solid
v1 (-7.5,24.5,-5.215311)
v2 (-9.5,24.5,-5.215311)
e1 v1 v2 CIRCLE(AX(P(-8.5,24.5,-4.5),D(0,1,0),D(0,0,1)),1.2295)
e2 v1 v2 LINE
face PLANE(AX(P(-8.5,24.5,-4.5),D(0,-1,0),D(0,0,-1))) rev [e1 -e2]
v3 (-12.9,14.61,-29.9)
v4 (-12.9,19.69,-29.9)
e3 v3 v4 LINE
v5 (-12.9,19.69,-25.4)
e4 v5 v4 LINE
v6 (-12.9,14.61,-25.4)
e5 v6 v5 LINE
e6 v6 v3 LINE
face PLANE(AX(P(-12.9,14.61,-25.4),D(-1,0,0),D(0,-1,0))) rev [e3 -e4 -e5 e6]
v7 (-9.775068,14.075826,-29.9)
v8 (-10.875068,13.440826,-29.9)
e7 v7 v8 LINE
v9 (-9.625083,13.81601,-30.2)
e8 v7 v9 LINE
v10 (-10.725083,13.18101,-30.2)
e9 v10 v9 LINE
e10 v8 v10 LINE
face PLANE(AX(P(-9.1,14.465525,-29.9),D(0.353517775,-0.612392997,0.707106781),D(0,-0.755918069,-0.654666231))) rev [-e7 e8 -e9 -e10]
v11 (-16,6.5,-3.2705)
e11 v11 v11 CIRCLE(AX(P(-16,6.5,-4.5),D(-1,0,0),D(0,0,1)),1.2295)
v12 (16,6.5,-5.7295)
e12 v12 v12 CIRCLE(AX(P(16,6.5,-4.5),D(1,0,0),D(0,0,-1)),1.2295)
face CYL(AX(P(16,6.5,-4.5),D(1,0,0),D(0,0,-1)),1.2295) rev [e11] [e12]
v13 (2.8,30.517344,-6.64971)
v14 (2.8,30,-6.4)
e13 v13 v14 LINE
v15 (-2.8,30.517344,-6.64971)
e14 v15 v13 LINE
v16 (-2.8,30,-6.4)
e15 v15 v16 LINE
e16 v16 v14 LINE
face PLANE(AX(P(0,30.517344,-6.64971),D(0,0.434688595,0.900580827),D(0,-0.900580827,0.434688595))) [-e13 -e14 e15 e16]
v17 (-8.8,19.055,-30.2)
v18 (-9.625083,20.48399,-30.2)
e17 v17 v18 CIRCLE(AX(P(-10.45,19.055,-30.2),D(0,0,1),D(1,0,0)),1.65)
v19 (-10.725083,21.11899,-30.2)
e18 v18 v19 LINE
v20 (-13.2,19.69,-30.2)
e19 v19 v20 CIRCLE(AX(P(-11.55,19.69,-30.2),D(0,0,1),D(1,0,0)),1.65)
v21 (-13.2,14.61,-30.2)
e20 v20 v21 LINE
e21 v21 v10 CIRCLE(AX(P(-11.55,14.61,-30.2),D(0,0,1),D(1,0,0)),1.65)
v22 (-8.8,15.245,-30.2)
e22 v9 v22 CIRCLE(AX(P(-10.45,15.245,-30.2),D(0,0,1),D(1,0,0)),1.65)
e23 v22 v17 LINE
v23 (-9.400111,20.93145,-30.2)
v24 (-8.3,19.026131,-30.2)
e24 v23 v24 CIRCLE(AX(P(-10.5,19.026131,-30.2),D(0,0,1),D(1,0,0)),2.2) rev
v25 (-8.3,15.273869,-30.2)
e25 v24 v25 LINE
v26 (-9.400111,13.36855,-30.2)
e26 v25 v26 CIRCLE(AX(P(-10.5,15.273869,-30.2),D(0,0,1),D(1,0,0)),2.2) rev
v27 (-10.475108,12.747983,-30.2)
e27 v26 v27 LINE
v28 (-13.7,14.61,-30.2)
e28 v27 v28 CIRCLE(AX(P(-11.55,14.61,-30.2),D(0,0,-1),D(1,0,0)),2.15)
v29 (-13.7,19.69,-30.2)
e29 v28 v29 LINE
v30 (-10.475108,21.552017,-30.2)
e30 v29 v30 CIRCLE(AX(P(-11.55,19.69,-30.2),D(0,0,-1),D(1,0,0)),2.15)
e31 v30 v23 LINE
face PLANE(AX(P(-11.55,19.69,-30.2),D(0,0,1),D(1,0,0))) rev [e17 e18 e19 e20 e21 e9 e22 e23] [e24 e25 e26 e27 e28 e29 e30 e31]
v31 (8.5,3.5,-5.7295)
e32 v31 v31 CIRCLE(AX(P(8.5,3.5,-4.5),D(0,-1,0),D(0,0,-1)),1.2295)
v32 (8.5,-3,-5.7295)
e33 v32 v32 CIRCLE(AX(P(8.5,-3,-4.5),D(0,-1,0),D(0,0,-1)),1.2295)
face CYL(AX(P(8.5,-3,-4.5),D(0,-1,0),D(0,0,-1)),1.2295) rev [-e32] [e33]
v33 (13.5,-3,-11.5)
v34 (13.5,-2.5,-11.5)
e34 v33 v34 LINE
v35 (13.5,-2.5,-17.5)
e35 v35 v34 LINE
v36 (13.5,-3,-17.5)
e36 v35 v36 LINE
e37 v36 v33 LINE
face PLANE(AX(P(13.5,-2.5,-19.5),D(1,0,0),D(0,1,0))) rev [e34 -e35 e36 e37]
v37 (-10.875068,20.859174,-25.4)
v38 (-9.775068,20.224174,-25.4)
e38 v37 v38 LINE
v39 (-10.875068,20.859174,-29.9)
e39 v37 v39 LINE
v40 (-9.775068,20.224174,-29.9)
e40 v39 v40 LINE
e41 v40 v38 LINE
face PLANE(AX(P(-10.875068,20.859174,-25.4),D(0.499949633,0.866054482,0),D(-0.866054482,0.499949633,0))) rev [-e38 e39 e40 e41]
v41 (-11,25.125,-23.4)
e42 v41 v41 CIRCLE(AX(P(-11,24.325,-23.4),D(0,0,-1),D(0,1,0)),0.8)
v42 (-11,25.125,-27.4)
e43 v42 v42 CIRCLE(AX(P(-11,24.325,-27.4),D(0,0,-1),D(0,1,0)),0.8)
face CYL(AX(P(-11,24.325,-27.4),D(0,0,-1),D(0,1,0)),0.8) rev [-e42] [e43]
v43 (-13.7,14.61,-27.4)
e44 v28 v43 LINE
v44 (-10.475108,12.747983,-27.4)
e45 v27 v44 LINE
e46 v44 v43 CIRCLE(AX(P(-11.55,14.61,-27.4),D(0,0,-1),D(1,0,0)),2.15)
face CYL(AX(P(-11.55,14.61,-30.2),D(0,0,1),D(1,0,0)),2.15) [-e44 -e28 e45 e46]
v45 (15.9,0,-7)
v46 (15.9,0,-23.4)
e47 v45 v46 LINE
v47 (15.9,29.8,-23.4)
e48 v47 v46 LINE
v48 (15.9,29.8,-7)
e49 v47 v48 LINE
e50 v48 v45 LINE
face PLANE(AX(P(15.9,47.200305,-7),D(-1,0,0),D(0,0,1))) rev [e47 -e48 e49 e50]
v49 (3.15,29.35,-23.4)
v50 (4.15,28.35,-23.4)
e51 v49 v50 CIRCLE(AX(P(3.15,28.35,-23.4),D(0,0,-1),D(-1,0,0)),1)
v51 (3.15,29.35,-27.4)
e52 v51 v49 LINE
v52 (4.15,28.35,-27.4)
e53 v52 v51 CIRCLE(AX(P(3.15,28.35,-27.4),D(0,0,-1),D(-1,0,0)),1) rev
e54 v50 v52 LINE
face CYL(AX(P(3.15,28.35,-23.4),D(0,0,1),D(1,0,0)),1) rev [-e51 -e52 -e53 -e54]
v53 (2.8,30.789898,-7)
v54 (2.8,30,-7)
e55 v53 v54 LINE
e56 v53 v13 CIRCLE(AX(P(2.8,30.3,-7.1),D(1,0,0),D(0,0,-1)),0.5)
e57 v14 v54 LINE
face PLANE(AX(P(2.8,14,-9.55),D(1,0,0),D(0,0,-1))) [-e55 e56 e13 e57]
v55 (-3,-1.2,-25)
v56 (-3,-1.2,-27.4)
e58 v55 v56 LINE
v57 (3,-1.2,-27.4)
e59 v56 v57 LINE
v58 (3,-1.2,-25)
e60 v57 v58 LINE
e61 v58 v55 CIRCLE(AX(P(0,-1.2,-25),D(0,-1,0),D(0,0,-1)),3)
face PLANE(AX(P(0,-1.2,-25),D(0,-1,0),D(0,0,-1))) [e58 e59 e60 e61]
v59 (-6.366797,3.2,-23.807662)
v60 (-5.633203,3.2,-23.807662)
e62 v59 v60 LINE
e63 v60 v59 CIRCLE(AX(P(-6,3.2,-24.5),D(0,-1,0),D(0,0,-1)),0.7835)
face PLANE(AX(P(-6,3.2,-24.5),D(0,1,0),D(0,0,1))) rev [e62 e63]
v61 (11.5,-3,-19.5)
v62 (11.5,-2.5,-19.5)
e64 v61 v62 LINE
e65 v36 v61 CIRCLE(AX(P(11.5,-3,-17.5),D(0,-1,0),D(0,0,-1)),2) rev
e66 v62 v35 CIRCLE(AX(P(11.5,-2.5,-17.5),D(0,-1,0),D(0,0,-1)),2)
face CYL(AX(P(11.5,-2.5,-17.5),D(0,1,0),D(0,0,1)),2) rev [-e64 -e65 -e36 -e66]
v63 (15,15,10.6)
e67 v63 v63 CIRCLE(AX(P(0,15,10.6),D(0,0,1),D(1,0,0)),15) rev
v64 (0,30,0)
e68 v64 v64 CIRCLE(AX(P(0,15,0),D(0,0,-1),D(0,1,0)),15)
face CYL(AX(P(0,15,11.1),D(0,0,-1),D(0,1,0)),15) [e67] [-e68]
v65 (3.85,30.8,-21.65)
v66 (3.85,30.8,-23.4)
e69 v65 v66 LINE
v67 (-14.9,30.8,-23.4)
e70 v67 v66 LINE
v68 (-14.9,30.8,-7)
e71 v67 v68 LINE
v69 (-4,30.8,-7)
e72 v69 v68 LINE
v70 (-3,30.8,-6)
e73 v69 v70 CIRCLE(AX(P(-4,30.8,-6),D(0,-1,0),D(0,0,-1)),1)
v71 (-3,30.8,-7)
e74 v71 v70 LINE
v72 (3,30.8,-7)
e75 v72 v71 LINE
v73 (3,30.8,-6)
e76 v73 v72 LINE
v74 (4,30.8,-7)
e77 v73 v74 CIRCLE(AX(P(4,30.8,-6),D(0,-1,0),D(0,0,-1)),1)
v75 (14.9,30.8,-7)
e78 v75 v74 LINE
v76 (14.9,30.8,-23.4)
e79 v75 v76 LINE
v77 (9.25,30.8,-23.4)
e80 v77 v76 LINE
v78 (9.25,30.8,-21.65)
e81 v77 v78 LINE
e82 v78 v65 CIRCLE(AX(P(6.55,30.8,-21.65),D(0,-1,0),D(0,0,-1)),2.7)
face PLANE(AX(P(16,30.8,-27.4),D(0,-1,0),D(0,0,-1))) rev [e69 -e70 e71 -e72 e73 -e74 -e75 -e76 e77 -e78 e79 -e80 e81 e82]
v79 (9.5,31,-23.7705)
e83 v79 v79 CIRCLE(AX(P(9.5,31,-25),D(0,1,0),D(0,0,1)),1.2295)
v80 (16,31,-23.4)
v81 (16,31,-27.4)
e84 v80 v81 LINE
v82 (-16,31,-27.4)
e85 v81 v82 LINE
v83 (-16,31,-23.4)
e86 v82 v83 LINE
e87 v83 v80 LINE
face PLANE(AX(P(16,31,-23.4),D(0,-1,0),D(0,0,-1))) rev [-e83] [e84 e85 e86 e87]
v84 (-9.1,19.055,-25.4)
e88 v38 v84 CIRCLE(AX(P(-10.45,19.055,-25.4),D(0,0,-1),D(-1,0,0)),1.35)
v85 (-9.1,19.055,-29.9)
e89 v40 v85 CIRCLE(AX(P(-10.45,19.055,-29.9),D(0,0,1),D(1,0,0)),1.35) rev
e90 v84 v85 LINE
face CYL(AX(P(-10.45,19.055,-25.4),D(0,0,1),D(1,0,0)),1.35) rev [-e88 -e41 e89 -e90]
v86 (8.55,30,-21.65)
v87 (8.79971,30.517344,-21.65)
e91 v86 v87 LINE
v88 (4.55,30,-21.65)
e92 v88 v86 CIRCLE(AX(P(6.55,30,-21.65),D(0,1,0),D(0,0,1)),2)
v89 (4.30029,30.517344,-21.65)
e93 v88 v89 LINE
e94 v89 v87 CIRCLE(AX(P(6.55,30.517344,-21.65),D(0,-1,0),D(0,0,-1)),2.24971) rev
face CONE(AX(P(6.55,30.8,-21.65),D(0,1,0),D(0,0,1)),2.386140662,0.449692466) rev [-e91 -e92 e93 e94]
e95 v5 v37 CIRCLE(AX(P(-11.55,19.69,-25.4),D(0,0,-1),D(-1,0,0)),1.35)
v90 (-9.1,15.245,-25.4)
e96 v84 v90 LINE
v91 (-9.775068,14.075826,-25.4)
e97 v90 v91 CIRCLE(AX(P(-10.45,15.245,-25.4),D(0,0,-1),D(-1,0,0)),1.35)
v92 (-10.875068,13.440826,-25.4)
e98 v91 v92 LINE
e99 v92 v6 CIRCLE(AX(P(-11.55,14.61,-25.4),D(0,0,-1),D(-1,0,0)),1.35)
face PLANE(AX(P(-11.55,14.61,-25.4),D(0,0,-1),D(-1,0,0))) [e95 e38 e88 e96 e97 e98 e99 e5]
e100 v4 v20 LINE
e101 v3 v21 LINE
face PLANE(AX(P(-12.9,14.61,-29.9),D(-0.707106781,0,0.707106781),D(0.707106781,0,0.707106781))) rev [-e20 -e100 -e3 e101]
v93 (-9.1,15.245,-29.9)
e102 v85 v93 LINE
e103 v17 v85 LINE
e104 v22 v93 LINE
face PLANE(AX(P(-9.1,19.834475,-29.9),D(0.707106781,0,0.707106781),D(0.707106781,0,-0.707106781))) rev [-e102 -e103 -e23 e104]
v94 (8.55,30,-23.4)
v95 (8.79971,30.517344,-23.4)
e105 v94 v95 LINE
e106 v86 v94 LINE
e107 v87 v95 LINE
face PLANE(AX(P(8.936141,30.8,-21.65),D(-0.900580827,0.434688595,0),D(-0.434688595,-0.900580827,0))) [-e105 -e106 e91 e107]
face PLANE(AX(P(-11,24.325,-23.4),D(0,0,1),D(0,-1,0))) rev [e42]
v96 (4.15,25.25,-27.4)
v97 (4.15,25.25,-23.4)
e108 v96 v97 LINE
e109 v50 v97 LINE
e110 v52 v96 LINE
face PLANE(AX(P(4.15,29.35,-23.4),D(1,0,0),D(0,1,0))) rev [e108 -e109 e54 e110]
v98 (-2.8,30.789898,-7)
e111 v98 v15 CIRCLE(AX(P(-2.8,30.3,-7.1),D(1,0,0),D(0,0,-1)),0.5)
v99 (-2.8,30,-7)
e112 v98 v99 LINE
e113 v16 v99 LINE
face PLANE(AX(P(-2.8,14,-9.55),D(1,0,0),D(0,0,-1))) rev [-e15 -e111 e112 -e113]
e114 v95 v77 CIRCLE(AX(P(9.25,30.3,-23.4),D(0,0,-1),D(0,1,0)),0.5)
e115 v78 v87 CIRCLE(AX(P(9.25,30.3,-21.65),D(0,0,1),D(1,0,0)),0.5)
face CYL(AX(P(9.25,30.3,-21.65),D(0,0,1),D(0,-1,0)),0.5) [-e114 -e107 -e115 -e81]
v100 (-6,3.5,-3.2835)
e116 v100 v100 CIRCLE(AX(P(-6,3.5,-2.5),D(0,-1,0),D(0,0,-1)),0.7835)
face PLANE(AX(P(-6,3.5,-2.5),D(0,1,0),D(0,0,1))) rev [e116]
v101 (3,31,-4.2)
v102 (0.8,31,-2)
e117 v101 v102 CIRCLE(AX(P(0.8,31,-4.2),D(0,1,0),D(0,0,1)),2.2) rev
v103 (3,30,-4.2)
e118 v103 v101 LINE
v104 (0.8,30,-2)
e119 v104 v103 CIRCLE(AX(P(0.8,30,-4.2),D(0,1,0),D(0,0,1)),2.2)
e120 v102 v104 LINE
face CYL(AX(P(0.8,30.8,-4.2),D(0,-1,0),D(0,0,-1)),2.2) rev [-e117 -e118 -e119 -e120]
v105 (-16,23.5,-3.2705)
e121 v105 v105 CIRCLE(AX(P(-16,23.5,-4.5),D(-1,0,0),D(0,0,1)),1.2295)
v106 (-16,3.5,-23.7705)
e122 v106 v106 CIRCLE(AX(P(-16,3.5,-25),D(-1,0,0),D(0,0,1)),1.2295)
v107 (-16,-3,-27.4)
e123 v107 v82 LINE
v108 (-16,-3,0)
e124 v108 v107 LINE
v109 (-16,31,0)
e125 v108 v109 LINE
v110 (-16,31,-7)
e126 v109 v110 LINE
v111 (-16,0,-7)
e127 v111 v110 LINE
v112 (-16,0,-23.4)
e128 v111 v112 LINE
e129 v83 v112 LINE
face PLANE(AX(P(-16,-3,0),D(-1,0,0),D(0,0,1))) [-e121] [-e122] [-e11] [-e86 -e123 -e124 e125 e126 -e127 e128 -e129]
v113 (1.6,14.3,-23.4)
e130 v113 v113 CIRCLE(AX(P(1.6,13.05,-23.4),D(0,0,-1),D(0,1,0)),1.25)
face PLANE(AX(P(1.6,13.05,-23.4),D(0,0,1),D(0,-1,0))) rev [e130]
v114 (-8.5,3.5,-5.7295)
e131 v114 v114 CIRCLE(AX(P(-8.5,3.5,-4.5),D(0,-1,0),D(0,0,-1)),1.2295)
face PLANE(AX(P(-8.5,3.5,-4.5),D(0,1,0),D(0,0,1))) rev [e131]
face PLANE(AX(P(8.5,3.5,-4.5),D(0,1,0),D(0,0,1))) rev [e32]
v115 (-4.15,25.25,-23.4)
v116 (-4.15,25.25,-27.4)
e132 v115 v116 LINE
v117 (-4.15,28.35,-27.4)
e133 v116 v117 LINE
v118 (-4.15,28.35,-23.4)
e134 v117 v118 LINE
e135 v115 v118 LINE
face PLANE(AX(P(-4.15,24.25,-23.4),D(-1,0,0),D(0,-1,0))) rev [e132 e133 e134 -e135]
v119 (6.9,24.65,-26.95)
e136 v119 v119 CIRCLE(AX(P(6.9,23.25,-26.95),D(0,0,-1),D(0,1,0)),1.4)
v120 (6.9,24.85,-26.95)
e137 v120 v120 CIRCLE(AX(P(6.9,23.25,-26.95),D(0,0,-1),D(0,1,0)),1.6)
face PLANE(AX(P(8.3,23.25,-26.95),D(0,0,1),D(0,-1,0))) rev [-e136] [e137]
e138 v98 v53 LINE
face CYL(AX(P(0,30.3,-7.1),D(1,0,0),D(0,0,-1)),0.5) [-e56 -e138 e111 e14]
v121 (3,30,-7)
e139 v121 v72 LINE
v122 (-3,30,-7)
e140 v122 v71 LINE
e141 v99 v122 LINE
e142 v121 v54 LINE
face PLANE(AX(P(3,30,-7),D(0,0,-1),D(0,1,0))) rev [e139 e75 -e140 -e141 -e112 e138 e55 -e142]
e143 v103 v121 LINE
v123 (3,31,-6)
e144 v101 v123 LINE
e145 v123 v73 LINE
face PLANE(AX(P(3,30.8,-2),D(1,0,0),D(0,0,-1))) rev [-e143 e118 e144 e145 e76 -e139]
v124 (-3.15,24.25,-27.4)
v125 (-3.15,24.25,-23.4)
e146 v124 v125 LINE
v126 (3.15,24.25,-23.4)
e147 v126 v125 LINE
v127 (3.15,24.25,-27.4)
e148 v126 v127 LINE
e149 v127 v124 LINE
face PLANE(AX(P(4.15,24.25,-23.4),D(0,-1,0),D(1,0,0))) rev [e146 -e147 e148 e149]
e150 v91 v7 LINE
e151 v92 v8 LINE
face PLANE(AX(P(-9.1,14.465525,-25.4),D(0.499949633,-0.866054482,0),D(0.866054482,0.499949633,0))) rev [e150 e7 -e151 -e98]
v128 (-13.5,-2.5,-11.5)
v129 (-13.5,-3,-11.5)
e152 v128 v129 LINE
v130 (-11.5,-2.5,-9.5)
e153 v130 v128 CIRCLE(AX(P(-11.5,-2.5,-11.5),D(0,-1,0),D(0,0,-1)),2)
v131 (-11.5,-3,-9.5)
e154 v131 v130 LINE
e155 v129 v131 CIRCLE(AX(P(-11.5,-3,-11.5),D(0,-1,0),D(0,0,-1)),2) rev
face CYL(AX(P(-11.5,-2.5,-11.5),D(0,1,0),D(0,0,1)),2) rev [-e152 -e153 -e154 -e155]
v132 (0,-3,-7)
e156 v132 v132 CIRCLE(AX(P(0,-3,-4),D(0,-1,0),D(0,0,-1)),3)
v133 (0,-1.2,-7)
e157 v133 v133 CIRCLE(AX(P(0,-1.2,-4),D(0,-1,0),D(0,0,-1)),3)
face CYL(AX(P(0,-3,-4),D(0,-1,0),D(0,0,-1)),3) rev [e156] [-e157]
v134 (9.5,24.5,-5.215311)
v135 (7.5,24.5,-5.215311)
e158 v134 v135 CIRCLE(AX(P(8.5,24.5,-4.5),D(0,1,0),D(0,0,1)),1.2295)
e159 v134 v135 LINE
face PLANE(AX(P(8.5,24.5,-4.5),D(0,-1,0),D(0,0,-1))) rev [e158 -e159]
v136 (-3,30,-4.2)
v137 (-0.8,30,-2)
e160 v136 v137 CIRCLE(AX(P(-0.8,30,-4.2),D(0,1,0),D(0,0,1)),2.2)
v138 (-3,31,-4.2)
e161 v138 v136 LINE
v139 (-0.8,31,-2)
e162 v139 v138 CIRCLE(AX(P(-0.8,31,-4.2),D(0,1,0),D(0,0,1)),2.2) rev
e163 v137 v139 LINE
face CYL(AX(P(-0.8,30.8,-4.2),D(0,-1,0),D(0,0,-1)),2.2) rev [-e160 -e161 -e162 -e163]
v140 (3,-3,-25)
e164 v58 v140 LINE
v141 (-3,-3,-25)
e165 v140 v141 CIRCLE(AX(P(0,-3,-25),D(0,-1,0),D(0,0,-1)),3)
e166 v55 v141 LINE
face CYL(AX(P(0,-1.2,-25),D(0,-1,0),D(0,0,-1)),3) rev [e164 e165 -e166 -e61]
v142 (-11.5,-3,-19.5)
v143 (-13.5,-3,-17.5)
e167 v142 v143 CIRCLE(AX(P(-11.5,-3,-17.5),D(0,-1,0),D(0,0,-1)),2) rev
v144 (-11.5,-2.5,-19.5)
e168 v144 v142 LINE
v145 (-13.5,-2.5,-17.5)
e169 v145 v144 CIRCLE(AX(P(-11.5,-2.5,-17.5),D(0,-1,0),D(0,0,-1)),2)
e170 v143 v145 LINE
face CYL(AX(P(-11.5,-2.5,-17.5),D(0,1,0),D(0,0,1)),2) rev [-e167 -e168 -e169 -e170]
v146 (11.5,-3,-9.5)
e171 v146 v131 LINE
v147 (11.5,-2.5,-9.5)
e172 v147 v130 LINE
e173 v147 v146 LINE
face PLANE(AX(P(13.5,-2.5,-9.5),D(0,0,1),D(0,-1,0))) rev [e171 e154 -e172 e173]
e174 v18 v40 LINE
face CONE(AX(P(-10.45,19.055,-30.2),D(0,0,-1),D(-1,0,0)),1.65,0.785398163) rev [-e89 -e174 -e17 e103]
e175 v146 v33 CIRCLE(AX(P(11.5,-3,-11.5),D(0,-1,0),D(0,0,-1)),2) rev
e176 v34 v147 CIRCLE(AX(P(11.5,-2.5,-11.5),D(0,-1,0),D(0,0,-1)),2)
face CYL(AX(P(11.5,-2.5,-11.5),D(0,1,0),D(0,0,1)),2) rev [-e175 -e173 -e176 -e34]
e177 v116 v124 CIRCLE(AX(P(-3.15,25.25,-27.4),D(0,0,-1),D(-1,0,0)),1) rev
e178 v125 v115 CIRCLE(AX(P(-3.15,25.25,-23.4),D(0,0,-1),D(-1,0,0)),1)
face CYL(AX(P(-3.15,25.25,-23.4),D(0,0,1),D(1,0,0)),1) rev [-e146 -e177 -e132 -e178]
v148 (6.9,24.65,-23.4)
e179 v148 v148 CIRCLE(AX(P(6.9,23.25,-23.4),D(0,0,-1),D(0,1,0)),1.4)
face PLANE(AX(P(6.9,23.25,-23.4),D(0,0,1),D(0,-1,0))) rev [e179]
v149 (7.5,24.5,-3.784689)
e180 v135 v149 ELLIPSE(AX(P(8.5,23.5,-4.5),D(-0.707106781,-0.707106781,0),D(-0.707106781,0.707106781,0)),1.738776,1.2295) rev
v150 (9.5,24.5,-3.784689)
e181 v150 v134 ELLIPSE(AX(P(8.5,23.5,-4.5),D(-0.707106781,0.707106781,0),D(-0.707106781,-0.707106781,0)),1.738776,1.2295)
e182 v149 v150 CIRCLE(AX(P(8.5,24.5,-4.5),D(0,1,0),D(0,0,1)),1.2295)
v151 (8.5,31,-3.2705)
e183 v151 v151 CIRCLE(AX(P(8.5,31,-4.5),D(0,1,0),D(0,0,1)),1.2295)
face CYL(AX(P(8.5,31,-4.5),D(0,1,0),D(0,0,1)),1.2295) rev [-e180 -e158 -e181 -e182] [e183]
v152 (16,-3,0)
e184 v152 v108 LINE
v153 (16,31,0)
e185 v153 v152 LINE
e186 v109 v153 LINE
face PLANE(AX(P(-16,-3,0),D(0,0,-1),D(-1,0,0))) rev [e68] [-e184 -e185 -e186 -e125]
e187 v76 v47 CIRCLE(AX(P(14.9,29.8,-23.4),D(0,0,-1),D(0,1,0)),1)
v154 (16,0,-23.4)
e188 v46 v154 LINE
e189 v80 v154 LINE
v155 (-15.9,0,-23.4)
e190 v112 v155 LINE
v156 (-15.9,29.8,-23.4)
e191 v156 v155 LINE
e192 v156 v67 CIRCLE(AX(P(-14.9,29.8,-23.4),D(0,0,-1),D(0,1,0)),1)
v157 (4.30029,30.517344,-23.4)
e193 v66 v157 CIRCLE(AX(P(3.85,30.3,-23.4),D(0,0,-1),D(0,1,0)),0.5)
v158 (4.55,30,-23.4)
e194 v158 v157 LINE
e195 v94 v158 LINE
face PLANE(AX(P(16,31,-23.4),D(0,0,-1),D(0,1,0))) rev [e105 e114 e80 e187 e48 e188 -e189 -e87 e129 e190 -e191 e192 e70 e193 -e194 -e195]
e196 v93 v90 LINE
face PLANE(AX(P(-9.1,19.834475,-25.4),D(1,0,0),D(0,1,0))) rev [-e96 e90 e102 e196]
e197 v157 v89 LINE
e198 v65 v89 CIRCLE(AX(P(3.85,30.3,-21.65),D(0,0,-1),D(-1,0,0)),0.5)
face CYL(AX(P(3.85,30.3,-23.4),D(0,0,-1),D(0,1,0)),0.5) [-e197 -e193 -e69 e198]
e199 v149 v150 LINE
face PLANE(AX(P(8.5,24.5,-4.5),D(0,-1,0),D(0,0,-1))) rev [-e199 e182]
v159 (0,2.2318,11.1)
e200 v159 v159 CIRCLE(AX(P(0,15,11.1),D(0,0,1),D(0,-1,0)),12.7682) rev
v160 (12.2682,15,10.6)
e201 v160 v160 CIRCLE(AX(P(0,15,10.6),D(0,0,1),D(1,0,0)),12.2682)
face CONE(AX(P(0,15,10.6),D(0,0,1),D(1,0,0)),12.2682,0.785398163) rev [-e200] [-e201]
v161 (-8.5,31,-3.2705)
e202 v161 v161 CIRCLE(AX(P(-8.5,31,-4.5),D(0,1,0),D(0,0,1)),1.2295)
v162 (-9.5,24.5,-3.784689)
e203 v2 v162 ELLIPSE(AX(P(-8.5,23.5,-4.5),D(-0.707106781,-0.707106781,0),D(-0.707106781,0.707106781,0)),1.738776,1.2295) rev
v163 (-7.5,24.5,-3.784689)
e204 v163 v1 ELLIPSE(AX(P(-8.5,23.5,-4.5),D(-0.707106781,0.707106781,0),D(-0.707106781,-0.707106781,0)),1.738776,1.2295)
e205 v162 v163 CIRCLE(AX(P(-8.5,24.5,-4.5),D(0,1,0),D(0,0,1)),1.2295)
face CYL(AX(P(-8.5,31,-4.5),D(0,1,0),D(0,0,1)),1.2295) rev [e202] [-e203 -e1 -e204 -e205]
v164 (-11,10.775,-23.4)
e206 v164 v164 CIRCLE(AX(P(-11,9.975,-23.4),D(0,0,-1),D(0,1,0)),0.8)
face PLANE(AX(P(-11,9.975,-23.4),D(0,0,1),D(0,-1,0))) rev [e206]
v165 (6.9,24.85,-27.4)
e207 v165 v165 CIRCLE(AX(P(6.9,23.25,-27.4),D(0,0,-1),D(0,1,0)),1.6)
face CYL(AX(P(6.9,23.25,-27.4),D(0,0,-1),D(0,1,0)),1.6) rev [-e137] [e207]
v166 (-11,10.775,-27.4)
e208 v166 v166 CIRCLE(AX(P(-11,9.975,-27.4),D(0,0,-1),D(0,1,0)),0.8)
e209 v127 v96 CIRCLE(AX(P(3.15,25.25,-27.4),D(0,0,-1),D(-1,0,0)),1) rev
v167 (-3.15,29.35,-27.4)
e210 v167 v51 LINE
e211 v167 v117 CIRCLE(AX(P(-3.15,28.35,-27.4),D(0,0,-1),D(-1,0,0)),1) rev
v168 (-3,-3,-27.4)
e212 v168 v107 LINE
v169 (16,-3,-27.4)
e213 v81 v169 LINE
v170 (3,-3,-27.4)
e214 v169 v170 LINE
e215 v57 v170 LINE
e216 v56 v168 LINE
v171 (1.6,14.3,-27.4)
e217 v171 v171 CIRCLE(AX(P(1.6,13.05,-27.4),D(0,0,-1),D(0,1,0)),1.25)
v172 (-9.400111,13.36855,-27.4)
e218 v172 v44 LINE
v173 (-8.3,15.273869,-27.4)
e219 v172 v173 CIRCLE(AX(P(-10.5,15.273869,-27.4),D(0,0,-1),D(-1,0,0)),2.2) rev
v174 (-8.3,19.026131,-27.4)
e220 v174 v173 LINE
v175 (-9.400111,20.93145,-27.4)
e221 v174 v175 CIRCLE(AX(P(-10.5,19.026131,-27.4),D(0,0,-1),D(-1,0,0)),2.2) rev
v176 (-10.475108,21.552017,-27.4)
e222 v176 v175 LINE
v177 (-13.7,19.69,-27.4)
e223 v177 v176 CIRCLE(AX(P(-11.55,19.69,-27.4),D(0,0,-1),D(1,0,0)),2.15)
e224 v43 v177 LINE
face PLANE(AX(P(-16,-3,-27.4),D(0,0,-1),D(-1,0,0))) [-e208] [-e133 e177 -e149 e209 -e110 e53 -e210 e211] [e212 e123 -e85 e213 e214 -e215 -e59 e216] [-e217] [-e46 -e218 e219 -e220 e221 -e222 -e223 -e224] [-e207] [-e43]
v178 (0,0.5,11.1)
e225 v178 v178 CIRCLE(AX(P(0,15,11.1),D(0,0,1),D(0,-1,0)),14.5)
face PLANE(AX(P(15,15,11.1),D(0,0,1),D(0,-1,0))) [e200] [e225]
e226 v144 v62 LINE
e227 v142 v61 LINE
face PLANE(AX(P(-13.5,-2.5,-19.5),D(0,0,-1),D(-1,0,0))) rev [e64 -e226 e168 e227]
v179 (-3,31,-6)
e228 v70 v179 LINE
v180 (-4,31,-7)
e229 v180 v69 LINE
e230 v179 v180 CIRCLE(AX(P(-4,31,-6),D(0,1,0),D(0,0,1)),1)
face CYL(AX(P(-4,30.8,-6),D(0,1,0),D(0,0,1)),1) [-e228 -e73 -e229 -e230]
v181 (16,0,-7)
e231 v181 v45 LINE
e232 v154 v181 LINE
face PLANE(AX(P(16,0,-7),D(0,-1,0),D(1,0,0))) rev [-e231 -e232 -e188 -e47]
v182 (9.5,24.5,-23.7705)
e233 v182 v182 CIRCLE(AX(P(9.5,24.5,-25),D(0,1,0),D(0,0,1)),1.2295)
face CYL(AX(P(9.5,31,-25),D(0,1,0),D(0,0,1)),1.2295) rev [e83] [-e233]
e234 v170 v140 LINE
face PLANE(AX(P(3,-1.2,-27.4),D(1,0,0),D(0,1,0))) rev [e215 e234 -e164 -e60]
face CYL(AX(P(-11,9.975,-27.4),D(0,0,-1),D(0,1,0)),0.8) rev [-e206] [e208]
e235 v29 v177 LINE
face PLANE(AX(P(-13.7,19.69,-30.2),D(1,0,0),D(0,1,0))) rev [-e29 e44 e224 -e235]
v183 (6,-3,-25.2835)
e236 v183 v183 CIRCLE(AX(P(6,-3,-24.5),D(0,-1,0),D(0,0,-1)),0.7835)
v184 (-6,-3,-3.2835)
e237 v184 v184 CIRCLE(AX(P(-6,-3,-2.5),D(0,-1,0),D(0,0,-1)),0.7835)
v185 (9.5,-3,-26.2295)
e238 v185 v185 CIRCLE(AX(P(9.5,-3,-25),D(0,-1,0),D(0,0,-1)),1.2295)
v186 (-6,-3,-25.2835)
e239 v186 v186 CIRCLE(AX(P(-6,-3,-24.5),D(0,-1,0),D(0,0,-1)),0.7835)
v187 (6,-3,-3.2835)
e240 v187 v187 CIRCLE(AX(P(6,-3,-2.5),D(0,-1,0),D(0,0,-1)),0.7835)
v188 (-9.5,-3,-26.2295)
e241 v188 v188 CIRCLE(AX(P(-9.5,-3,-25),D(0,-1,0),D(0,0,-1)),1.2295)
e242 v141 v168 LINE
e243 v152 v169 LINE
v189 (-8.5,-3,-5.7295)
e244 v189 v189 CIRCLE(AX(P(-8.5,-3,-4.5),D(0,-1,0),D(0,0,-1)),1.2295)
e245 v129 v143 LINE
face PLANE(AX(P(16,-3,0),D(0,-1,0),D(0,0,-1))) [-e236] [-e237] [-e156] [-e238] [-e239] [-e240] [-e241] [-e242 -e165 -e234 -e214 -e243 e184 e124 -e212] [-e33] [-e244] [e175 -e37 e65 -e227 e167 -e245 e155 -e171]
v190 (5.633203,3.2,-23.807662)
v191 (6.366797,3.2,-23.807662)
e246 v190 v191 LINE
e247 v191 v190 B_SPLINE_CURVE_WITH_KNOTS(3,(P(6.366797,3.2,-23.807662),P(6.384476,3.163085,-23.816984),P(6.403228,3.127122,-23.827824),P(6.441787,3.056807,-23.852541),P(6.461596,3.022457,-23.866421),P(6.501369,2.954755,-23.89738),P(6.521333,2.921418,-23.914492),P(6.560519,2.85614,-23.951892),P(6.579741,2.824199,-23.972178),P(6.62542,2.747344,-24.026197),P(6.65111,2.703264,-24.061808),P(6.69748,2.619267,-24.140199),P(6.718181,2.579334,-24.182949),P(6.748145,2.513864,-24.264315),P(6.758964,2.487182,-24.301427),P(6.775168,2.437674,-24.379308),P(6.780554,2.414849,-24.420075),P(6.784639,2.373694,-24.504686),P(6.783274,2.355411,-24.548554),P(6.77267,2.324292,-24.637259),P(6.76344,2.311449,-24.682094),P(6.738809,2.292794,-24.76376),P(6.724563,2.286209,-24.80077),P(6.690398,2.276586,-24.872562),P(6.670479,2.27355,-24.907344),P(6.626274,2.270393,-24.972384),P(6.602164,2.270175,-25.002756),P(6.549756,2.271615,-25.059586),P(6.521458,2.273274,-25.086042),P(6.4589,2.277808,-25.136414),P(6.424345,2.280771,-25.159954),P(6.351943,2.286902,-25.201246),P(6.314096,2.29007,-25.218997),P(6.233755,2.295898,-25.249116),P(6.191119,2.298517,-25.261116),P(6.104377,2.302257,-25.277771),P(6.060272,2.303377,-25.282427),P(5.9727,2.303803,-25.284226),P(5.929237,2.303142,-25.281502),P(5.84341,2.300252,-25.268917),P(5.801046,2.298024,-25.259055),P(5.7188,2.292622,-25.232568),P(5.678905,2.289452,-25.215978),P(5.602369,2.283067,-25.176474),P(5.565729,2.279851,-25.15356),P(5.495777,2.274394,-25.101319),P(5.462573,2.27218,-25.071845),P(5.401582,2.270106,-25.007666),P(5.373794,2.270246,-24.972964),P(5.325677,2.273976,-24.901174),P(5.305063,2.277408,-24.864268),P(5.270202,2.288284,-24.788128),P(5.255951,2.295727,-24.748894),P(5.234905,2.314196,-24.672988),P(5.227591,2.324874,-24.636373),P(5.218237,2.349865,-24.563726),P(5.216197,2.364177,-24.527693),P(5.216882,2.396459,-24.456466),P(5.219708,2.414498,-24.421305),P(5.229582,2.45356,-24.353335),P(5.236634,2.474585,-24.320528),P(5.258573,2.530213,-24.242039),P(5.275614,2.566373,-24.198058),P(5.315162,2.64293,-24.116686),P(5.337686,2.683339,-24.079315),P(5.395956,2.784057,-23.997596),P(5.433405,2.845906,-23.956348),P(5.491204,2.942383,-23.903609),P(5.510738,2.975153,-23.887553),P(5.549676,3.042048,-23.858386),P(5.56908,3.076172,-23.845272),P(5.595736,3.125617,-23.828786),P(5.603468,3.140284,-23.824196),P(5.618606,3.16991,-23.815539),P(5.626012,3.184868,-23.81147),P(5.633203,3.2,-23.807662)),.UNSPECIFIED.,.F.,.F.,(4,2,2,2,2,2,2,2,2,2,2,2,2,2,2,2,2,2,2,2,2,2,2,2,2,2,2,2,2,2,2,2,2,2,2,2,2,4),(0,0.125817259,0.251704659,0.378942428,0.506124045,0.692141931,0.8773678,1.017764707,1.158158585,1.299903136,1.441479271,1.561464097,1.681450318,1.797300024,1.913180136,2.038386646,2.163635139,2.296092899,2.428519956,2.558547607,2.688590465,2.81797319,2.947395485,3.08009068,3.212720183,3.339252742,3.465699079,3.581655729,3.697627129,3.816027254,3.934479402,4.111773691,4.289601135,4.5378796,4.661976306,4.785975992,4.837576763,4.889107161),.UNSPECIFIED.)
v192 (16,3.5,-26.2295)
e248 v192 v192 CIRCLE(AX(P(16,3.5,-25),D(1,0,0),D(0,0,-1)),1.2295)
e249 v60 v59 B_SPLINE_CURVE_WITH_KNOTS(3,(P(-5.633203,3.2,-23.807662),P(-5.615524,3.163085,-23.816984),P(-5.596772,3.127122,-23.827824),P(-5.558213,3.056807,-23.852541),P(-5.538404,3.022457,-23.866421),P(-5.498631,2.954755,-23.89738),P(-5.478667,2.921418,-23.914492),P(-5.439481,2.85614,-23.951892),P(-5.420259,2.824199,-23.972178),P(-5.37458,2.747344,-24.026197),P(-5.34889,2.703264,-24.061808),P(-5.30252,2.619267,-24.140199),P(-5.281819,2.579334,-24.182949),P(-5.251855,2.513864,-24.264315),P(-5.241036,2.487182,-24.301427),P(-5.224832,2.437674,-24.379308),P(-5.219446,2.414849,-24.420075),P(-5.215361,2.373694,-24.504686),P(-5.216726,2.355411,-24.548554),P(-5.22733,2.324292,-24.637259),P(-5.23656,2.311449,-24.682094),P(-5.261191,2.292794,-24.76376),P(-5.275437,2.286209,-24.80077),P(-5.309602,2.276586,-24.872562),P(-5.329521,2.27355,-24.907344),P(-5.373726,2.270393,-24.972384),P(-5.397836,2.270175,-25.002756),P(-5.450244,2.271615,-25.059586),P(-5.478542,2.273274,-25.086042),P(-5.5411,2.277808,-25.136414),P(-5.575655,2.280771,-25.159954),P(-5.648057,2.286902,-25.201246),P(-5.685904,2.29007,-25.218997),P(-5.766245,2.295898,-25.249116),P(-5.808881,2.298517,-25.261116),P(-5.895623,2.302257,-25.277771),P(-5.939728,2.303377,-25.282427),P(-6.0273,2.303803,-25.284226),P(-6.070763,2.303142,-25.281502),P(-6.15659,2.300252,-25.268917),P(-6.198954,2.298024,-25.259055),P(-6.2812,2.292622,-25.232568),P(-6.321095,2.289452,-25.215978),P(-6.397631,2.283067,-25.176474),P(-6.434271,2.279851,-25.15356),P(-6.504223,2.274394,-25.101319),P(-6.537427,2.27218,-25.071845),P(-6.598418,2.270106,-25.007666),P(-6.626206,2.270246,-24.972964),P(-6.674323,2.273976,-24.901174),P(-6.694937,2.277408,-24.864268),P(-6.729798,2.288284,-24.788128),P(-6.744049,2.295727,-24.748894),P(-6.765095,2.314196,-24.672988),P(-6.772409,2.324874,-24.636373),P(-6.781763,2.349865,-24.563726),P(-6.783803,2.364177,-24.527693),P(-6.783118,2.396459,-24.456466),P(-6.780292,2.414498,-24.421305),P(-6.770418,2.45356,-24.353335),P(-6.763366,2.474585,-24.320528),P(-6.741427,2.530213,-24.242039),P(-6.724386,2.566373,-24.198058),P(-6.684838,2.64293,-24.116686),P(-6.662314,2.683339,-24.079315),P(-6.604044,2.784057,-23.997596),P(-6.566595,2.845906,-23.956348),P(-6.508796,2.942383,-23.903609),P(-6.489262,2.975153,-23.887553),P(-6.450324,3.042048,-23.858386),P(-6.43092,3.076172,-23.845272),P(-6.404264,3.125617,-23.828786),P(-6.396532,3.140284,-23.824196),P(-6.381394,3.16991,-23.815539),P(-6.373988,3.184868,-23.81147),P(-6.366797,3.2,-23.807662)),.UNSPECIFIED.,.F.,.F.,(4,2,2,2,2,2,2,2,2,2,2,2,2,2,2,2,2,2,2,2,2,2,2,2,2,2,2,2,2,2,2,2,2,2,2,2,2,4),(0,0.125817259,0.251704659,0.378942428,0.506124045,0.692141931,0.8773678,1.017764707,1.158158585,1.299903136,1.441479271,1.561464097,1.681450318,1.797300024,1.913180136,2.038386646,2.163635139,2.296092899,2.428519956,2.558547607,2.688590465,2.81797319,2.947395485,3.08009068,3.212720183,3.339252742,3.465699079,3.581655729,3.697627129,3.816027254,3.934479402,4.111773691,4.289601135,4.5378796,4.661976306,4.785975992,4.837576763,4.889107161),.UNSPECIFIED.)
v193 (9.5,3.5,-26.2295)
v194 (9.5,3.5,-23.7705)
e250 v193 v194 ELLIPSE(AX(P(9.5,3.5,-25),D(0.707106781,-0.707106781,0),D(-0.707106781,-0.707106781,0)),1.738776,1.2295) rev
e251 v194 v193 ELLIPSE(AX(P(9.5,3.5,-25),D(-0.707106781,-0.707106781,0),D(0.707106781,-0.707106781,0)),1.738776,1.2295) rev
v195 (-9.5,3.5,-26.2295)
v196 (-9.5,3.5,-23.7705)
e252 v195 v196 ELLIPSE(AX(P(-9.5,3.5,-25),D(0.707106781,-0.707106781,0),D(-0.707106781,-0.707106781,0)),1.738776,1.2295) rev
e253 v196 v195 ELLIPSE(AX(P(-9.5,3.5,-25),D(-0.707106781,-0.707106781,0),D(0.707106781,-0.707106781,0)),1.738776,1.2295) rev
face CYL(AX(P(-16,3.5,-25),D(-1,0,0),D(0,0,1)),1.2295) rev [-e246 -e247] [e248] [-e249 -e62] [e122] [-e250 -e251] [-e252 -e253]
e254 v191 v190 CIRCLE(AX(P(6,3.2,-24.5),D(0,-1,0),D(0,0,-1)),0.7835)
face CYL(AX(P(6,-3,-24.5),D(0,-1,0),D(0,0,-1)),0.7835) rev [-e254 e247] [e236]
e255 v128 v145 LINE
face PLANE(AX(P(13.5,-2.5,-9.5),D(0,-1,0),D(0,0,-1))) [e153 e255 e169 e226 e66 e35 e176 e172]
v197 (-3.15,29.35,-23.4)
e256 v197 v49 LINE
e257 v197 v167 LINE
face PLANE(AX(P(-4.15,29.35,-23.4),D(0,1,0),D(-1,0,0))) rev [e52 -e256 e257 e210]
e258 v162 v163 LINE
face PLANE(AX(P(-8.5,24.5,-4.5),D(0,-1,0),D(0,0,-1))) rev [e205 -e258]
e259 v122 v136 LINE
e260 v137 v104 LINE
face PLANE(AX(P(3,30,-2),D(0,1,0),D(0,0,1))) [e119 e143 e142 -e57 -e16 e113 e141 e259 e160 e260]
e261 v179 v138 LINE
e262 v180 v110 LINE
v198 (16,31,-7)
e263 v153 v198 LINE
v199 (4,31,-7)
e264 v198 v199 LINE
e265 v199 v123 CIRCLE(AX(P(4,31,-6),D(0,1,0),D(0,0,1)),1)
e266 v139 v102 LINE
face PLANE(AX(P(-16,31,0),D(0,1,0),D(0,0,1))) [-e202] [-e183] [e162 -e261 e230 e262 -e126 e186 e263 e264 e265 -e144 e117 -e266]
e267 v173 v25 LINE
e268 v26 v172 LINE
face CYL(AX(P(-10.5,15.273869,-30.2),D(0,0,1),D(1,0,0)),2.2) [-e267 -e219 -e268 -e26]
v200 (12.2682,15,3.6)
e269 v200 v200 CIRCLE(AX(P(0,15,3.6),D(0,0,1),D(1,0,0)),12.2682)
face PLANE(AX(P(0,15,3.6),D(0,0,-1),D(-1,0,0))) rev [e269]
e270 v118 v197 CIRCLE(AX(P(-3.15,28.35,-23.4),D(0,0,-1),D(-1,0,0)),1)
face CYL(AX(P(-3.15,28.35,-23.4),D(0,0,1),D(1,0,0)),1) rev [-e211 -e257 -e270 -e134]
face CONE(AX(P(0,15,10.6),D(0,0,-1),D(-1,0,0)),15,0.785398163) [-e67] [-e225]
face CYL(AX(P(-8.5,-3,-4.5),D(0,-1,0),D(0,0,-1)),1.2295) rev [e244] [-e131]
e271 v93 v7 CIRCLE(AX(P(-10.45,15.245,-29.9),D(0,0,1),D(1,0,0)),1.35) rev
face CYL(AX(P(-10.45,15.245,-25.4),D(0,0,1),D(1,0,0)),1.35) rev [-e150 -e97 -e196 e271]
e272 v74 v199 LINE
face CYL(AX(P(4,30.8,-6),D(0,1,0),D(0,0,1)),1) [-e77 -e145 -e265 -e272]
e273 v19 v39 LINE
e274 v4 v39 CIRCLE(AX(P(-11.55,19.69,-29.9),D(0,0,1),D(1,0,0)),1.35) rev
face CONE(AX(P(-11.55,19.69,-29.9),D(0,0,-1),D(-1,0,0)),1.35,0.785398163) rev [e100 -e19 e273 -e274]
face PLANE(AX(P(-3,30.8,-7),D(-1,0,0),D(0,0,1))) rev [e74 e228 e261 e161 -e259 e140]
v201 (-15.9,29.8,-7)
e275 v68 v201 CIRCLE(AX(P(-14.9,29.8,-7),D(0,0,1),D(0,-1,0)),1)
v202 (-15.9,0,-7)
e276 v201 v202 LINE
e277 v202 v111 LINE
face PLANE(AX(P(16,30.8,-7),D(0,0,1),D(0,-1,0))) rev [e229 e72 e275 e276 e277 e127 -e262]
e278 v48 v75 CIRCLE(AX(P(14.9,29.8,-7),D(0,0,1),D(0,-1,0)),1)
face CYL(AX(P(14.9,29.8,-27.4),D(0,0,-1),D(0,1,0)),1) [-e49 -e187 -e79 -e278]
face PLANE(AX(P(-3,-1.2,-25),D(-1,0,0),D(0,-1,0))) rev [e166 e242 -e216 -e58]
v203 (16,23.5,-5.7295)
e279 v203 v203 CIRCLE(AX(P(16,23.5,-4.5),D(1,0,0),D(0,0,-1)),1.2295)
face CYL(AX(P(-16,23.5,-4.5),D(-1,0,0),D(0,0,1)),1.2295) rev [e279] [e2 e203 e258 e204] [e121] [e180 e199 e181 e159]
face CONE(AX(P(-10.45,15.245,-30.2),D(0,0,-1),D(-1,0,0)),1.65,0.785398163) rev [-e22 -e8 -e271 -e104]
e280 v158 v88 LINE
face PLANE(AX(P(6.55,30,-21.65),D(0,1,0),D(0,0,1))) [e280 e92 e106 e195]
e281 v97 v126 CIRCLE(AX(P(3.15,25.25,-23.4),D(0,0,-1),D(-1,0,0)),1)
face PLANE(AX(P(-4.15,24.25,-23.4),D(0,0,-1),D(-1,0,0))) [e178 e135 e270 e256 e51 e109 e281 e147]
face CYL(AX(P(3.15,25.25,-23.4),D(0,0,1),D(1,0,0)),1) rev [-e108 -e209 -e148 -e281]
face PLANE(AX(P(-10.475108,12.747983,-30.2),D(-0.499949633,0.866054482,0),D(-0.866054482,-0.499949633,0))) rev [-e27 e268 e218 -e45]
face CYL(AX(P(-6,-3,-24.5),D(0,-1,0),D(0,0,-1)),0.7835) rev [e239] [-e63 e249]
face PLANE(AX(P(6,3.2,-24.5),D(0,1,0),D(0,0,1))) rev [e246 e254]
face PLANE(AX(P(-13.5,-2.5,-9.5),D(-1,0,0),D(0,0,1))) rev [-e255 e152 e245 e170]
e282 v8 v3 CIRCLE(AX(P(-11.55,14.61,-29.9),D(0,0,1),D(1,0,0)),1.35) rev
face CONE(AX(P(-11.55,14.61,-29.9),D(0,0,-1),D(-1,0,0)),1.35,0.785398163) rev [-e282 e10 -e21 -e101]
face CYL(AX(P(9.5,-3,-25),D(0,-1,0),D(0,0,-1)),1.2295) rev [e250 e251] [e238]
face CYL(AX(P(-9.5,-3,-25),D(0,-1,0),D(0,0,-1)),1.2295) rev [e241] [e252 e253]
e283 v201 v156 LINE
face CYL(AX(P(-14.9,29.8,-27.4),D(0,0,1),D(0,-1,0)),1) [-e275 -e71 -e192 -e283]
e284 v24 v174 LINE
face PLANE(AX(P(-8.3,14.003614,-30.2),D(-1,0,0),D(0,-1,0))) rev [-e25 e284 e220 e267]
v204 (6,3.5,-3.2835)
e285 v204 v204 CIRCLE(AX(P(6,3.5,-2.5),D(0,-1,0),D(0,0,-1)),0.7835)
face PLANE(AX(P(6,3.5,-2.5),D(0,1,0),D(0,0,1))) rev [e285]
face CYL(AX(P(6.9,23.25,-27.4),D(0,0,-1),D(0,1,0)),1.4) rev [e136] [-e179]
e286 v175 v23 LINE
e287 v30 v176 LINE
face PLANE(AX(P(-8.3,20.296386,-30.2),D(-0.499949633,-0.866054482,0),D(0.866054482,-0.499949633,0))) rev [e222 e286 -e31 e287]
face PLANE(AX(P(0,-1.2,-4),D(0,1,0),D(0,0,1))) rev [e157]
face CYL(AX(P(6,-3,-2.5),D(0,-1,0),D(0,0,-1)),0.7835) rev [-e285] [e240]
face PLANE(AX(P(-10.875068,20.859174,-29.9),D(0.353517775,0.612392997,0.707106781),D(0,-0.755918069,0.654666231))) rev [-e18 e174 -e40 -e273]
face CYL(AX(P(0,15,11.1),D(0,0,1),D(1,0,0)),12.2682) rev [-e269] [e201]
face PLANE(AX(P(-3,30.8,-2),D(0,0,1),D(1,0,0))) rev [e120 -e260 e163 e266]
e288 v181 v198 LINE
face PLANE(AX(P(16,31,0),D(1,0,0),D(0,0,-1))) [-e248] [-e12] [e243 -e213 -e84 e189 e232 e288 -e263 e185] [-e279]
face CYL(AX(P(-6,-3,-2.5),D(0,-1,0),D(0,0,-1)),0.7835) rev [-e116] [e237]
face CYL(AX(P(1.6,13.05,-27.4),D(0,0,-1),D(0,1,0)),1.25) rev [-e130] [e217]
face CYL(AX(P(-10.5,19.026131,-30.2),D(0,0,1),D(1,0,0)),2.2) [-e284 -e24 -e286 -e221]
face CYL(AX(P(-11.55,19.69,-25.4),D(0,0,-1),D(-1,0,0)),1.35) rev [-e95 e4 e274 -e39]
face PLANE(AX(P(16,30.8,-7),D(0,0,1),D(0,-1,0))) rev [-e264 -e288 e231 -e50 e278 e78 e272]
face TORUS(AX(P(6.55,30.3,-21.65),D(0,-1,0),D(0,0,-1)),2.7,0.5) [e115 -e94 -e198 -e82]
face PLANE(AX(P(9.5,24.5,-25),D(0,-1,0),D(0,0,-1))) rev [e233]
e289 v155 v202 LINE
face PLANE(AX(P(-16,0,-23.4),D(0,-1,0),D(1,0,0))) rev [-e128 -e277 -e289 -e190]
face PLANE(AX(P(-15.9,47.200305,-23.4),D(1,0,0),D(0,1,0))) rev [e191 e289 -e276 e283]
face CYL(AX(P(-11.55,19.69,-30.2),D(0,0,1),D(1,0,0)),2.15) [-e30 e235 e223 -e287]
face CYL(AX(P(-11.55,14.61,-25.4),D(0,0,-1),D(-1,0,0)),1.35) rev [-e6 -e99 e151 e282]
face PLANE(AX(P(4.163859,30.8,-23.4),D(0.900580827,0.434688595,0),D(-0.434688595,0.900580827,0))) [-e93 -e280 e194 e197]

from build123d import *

# Parameters (mm, degrees)
SKETCH1_W                                          = 32
SKETCH1_H                                          = 34
BOSS_EXTRUDE1_DEPTH                                = 27.4
SKETCH2_W                                          = 20.4
SKETCH2_H                                          = 0.2
CUT_EXTRUDE1_DEPTH                                 = 53.304493115
SKETCH3_W                                          = 6
SKETCH3_H                                          = 5
CUT_EXTRUDE2_DEPTH                                 = 0.2
SKETCH4_W                                          = 6
SKETCH4_H                                          = 5
CUT_EXTRUDE3_DEPTH                                 = 0.8
SKETCH5_W                                          = 32
SKETCH5_H                                          = 4
BOSS_EXTRUDE2_DEPTH                                = 0.2
CUT_EXTRUDE4_DEPTH                                 = 0.8
CUT_EXTRUDE5_REACH                                 = 46.359
SKETCH8_W                                          = 0.1
SKETCH8_H                                          = 16.4
CUT_EXTRUDE6_REACH                                 = 46.359
SKETCH10_W                                         = 0.1
SKETCH10_H                                         = 16.4
BOSS_EXTRUDE3_DEPTH                                = 2.8
CUT_EXTRUDE7_DEPTH                                 = 4.8
SKETCH13_W                                         = 27
SKETCH13_H                                         = 10
CUT_EXTRUDE8_DEPTH                                 = 0.5
CUT_EXTRUDE9_DEPTH                                 = 1.8
SKETCH15_W                                         = 8.3
SKETCH15_H                                         = 5.1
CUT_EXTRUDE10_DEPTH                                = 4
DRAFT1_ANGLE                                       = 25.765480369
SKETCH16_W                                         = 15
SKETCH16_H                                         = 11.1
F_2_5_2_5_DIAMETER_HOLE1_D                         = 2.5
F_2_5_2_5_DIAMETER_HOLE1_DEPTH                     = 4
F_1_6_1_6_DIAMETER_HOLE1_D                         = 1.6
F_1_6_1_6_DIAMETER_HOLE1_DEPTH                     = 4
F_6_0_6_DIAMETER_HOLE1_D                           = 6
F_6_0_6_DIAMETER_HOLE1_DEPTH                       = 1.8
HOLE1_D                                            = 1.567
HOLE1_DEPTH                                        = 6.2
HOLE2_D                                            = 1.567
HOLE2_DEPTH                                        = 6.5
M2_CLEARANCE_HOLE1_D                               = 2.459
M2_CLEARANCE_HOLE1_DEPTH                           = 6.5
M2_CLEARANCE_HOLE2_D                               = 2.459
M2_CLEARANCE_HOLE2_DEPTH                           = 6.5
CBORE_FOR_M2_5_HEX_HEAD_MACHINE_SCREW1_D           = 2.8
CBORE_FOR_M2_5_HEX_HEAD_MACHINE_SCREW1_DEPTH       = 4
CBORE_FOR_M2_5_HEX_HEAD_MACHINE_SCREW1_CBORE_D     = 3.2
CBORE_FOR_M2_5_HEX_HEAD_MACHINE_SCREW1_CBORE_DEPTH = 0.45
M2_CLEARANCE_HOLE3_D                               = 2.459
M2_CLEARANCE_HOLE3_DEPTH                           = 38.5
M2_CLEARANCE_HOLE4_D                               = 2.459
M2_CLEARANCE_HOLE4_DEPTH                           = 6.5
M22_CLEARANCE_HOLE1_D                              = 24.5364
M22_CLEARANCE_HOLE1_DEPTH                          = 7.5
RIB1_START                                         = -2.8
RIB1_DEPTH                                         = 5.6
FILLET1_R                                          = 1.35
CHAMFER1_SIZE                                      = 0.5
CHAMFER2_SIZE                                      = 0.3
FILLET2_R                                          = 0.5
FILLET3_R                                          = 1
FILLET4_R                                          = 2
FILLET5_R                                          = 2.2


# Read off the part's stored shape, not the designer's step: Rib1
with BuildPart() as part:
    # Sketch1 → Boss-Extrude1 (new body)
    with BuildSketch(Plane(origin=(0, 0, -27.4), x_dir=(-1, 0, 0), z_dir=(0, 0, -1))):
        with Locations((0, 14)):
            Rectangle(SKETCH1_W, SKETCH1_H)
    extrude(amount=-BOSS_EXTRUDE1_DEPTH)

    # Sketch2 → Cut-Extrude1 (cut, through all)
    with BuildSketch(Plane.ZY.offset(16)):
        with Locations((-17.2, 30.9)):
            Rectangle(SKETCH2_W, SKETCH2_H)
    extrude(amount=-CUT_EXTRUDE1_DEPTH, mode=Mode.SUBTRACT)

    # Sketch3 → Cut-Extrude2 (cut)
    with BuildSketch(Plane(origin=(0, 31, 0), x_dir=(-1, 0, 0), z_dir=(0, 1, 0))):
        with Locations((0, -4.5)):
            Rectangle(SKETCH3_W, SKETCH3_H)
    extrude(amount=-CUT_EXTRUDE2_DEPTH, mode=Mode.SUBTRACT)

    # Sketch4 → Cut-Extrude3 (cut)
    with BuildSketch(Plane(origin=(0, 30.8, 0), x_dir=(-1, 0, 0), z_dir=(0, 1, 0))):
        with Locations((0, -4.5)):
            Rectangle(SKETCH4_W, SKETCH4_H)
    extrude(amount=-CUT_EXTRUDE3_DEPTH, mode=Mode.SUBTRACT)

    # Sketch5 → Boss-Extrude2 (add)
    with BuildSketch(Plane(origin=(0, 30.8, 0), x_dir=(-1, 0, 0), z_dir=(0, 1, 0))):
        with Locations((0, -25.4)):
            Rectangle(SKETCH5_W, SKETCH5_H)
    extrude(amount=BOSS_EXTRUDE2_DEPTH)

    # Sketch6 → Cut-Extrude4 (cut)
    with BuildSketch(Plane(origin=(0, 30.8, 0), x_dir=(-1, 0, 0), z_dir=(0, 1, 0))):
        with BuildLine():
            Line((-8.936140662, -21.65), (-8.936140662, -23.4))
            Line((-8.936140662, -23.4), (-4.163859338, -23.4))
            Line((-4.163859338, -23.4), (-4.163859338, -21.65))
            ThreePointArc((-4.163859338, -21.65), (-6.55, -19.263859338), (-8.936140662, -21.65))
        make_face()
    extrude(amount=-CUT_EXTRUDE4_DEPTH, mode=Mode.SUBTRACT)

    # Sketch8 → Cut-Extrude5 (cut, up to next)
    with BuildSketch(Plane.XZ, mode=Mode.PRIVATE) as cut_extrude5_sk1:
        with Locations((-15.95, -15.2)):
            Rectangle(SKETCH8_W, SKETCH8_H)
    cut_extrude5_tool1 = extrude(cut_extrude5_sk1.sketch, amount=-CUT_EXTRUDE5_REACH, mode=Mode.PRIVATE) & part.part
    add(cut_extrude5_tool1.solids().sort_by_distance((-15.95, 0, -15.2))[0], mode=Mode.SUBTRACT)

    # Sketch10 → Cut-Extrude6 (cut, up to next)
    with BuildSketch(Plane.XZ, mode=Mode.PRIVATE) as cut_extrude6_sk1:
        with Locations((15.95, -15.2)):
            Rectangle(SKETCH10_W, SKETCH10_H)
    cut_extrude6_tool1 = extrude(cut_extrude6_sk1.sketch, amount=-CUT_EXTRUDE6_REACH, mode=Mode.PRIVATE) & part.part
    add(cut_extrude6_tool1.solids().sort_by_distance((15.95, 0, -15.2))[0], mode=Mode.SUBTRACT)

    # Sketch11 → Boss-Extrude3 (add)
    with BuildSketch(Plane(origin=(0, 0, -27.4), x_dir=(-1, 0, 0), z_dir=(0, 0, -1))):
        with BuildLine():
            Line((13.7, 19.69), (13.7, 14.61))
            ThreePointArc((13.7, 14.61), (12.625054144, 12.748076643), (10.47510829, 12.747982865))
            Line((10.47510829, 12.747982865), (8.3, 14.003613559))
            Line((8.3, 14.003613559), (8.3, 20.296386441))
            Line((8.3, 20.296386441), (10.47510829, 21.552017135))
            ThreePointArc((10.47510829, 21.552017135), (12.625054144, 21.551923357), (13.7, 19.69))
        make_face()
    extrude(amount=BOSS_EXTRUDE3_DEPTH)

    # Sketch12 → Cut-Extrude7 (cut)
    with BuildSketch(Plane(origin=(0, 0, -30.2), x_dir=(-1, 0, 0), z_dir=(0, 0, -1))):
        with BuildLine():
            Line((12.9, 14.61), (12.9, 19.69))
            ThreePointArc((12.9, 19.69), (12.225033997, 20.859114666), (10.875067996, 20.85917355))
            Line((10.875067996, 20.85917355), (9.1, 19.834475207))
            Line((9.1, 19.834475207), (9.1, 14.465524793))
            Line((9.1, 14.465524793), (10.875067996, 13.44082645))
            ThreePointArc((10.875067996, 13.44082645), (12.225033997, 13.440885334), (12.9, 14.61))
        make_face()
    extrude(amount=-CUT_EXTRUDE7_DEPTH, mode=Mode.SUBTRACT)

    # Sketch13 → Cut-Extrude8 (cut)
    with BuildSketch(Plane.XZ.offset(3)):
        with Locations((0, -14.5)):
            Rectangle(SKETCH13_W, SKETCH13_H)
    extrude(amount=-CUT_EXTRUDE8_DEPTH, mode=Mode.SUBTRACT)

    # Sketch14 → Cut-Extrude9 (cut)
    with BuildSketch(Plane.XZ.offset(3)):
        with BuildLine():
            Line((3, -27.4), (3, -25))
            ThreePointArc((3, -25), (0, -22), (-3, -25))
            Line((-3, -25), (-3, -27.4))
            Line((-3, -27.4), (3, -27.4))
        make_face()
    extrude(amount=-CUT_EXTRUDE9_DEPTH, mode=Mode.SUBTRACT)

    # Sketch15 → Cut-Extrude10 (cut)
    with BuildSketch(Plane(origin=(0, 0, -27.4), x_dir=(-1, 0, 0), z_dir=(0, 0, -1))):
        with Locations((0, 26.8)):
            Rectangle(SKETCH15_W, SKETCH15_H)
    extrude(amount=-CUT_EXTRUDE10_DEPTH, mode=Mode.SUBTRACT)

    # Draft1
    draft1_faces = [part.faces().sort_by_distance(p)[0] for p in [
        (6.55, 30.4, -19.263859338),
        (8.936140662, 30.4, -22.525),
        (4.163859338, 30.4, -22.525),
    ]]
    draft(draft1_faces, Plane(origin=(16, 30.8, -27.4), x_dir=(0, 0, 1), z_dir=(0, 1, 0)), DRAFT1_ANGLE)

    # Sketch16 → Revolve1 (revolve)
    with BuildSketch(Plane.XZ.offset(-15), mode=Mode.PRIVATE) as revolve1_sk:
        with Locations((7.5, 5.55)):
            Rectangle(SKETCH16_W, SKETCH16_H)
    revolve(revolve1_sk.sketch.rotate(Axis((0, 15, 11.1), (0, 0, -1)), 270), axis=Axis((0, 15, 11.1), (0, 0, -1)))

    # Ø2.5 (2.5) Diameter Hole1
    with Locations(Plane(origin=(0, 0, -27.4), x_dir=(-1, 0, 0), z_dir=(0, 0, -1))):
        with Locations((-1.6, 13.05)):
            Hole(F_2_5_2_5_DIAMETER_HOLE1_D / 2, depth=F_2_5_2_5_DIAMETER_HOLE1_DEPTH)

    # Ø1.6 (1.6) Diameter Hole1
    with Locations(Plane(origin=(0, 0, -27.4), x_dir=(-1, 0, 0), z_dir=(0, 0, -1))):
        with Locations((11, 24.325), (11, 9.975)):
            Hole(F_1_6_1_6_DIAMETER_HOLE1_D / 2, depth=F_1_6_1_6_DIAMETER_HOLE1_DEPTH)

    # Ø6.0 (6) Diameter Hole1
    with Locations(Plane.XZ.offset(3)):
        with Locations((0, -4)):
            Hole(F_6_0_6_DIAMETER_HOLE1_D / 2, depth=F_6_0_6_DIAMETER_HOLE1_DEPTH)

    # Hole1
    with Locations(Plane.XZ.offset(3)):
        with Locations((-6, -24.5), (6, -24.5)):
            Hole(HOLE1_D / 2, depth=HOLE1_DEPTH)

    # Hole2
    with Locations(Plane.XZ.offset(3)):
        with Locations((6, -2.5), (-6, -2.5)):
            Hole(HOLE2_D / 2, depth=HOLE2_DEPTH)

    # M2 Clearance Hole1
    with Locations(Plane(origin=(16, 0, 0), x_dir=(0, 0, -1), z_dir=(1, 0, 0))):
        with Locations((4.5, 6.5)):
            Hole(M2_CLEARANCE_HOLE1_D / 2, depth=M2_CLEARANCE_HOLE1_DEPTH)

    # M2 Clearance Hole2
    with Locations(Plane.XZ.offset(3)):
        with Locations((-9.5, -25), (9.5, -25), (8.5, -4.5), (-8.5, -4.5)):
            Hole(M2_CLEARANCE_HOLE2_D / 2, depth=M2_CLEARANCE_HOLE2_DEPTH)

    # CBORE for M2.5 Hex Head Machine Screw1
    with Locations(Plane(origin=(0, 0, -27.4), x_dir=(-1, 0, 0), z_dir=(0, 0, -1))):
        with Locations((-6.9, 23.25)):
            CounterBoreHole(CBORE_FOR_M2_5_HEX_HEAD_MACHINE_SCREW1_D / 2, CBORE_FOR_M2_5_HEX_HEAD_MACHINE_SCREW1_CBORE_D / 2, CBORE_FOR_M2_5_HEX_HEAD_MACHINE_SCREW1_CBORE_DEPTH, depth=CBORE_FOR_M2_5_HEX_HEAD_MACHINE_SCREW1_DEPTH)

    # M2 Clearance Hole3
    with Locations(Plane.ZY.offset(16)):
        with Locations((-4.5, 23.5), (-4.5, 6.5), (-25, 3.5)):
            Hole(M2_CLEARANCE_HOLE3_D / 2, depth=M2_CLEARANCE_HOLE3_DEPTH)

    # M2 Clearance Hole4
    with Locations(Plane(origin=(0, 31, 0), x_dir=(-1, 0, 0), z_dir=(0, 1, 0))):
        with Locations((8.5, -4.5), (-8.5, -4.5), (-9.5, -25)):
            Hole(M2_CLEARANCE_HOLE4_D / 2, depth=M2_CLEARANCE_HOLE4_DEPTH)

    # M22 Clearance Hole1
    with Locations(Plane.XY.offset(11.1)):
        with Locations((0, 15)):
            Hole(M22_CLEARANCE_HOLE1_D / 2, depth=M22_CLEARANCE_HOLE1_DEPTH)

    # Rib1 outline → Rib1 (add)
    with BuildSketch(Plane(origin=(0, 0, 0), x_dir=(0, 0, -1), z_dir=(1, 0, 0)).offset(RIB1_START)):
        with BuildLine():
            ThreePointArc((7, 30.789897949), (6.792955609, 30.694618477), (6.649709587, 30.517344298))
            Line((6.649709587, 30.517344298), (6.4, 30))
            Line((6.4, 30), (7, 30))
            Line((7, 30), (7, 30.789897949))
        make_face()
    extrude(amount=RIB1_DEPTH)

    # Fillet1
    fillet1_edges = [part.edges().sort_by_distance(p)[0] for p in [
        (-9.1, 14.465524793, -27.8),
        (-9.1, 19.834475207, -27.8),
    ]]
    fillet(fillet1_edges, radius=FILLET1_R)

    # Chamfer1
    chamfer1_edges = [part.edges().sort_by_distance(p)[0] for p in [
        (0, 0, 11.1),
        (12.2682, 15, 11.1),
    ]]
    chamfer(chamfer1_edges, length=CHAMFER1_SIZE)

    # Chamfer2
    chamfer2_edges = [part.edges().sort_by_distance(p)[0] for p in [
        (-12.225033997, 13.440885334, -30.2),
        (-12.9, 17.15, -30.2),
        (-12.225033997, 20.859114666, -30.2),
        (-10.325067996, 20.54167355, -30.2),
        (-9.1, 17.15, -30.2),
        (-10.325067996, 13.75832645, -30.2),
        (-9.280885334, 19.730033997, -30.2),
        (-9.280885334, 14.569966003, -30.2),
    ]]
    chamfer(chamfer2_edges, length=CHAMFER2_SIZE)

    # Fillet2
    fillet2_edges = [part.edges().sort_by_distance(p)[0] for p in [
        (6.55, 30.8, -19.263859338),
        (8.936140662, 30.8, -22.525),
        (4.163859338, 30.8, -22.525),
    ]]
    fillet(fillet2_edges, radius=FILLET2_R)

    # Fillet3
    fillet3_edges = [part.edges().sort_by_distance(p)[0] for p in [
        (-4.15, 24.25, -25.4),
        (4.15, 24.25, -25.4),
        (4.15, 29.35, -25.4),
        (-4.15, 29.35, -25.4),
        (-3, 30.9, -7),
        (3, 30.9, -7),
        (-15.9, 30.8, -15.2),
        (15.9, 30.8, -15.2),
    ]]
    fillet(fillet3_edges, radius=FILLET3_R)

    # Fillet4
    fillet4_edges = [part.edges().sort_by_distance(p)[0] for p in [
        (13.5, -2.75, -9.5),
        (13.5, -2.75, -19.5),
        (-13.5, -2.75, -19.5),
        (-13.5, -2.75, -9.5),
    ]]
    fillet(fillet4_edges, radius=FILLET4_R)

    # Fillet5
    fillet5_edges = [part.edges().sort_by_distance(p)[0] for p in [
        (-8.3, 20.296386441, -28.8),
        (-8.3, 14.003613559, -28.8),
        (3, 30.5, -2),
        (-3, 30.5, -2),
    ]]
    fillet(fillet5_edges, radius=FILLET5_R)


solid = part.part
